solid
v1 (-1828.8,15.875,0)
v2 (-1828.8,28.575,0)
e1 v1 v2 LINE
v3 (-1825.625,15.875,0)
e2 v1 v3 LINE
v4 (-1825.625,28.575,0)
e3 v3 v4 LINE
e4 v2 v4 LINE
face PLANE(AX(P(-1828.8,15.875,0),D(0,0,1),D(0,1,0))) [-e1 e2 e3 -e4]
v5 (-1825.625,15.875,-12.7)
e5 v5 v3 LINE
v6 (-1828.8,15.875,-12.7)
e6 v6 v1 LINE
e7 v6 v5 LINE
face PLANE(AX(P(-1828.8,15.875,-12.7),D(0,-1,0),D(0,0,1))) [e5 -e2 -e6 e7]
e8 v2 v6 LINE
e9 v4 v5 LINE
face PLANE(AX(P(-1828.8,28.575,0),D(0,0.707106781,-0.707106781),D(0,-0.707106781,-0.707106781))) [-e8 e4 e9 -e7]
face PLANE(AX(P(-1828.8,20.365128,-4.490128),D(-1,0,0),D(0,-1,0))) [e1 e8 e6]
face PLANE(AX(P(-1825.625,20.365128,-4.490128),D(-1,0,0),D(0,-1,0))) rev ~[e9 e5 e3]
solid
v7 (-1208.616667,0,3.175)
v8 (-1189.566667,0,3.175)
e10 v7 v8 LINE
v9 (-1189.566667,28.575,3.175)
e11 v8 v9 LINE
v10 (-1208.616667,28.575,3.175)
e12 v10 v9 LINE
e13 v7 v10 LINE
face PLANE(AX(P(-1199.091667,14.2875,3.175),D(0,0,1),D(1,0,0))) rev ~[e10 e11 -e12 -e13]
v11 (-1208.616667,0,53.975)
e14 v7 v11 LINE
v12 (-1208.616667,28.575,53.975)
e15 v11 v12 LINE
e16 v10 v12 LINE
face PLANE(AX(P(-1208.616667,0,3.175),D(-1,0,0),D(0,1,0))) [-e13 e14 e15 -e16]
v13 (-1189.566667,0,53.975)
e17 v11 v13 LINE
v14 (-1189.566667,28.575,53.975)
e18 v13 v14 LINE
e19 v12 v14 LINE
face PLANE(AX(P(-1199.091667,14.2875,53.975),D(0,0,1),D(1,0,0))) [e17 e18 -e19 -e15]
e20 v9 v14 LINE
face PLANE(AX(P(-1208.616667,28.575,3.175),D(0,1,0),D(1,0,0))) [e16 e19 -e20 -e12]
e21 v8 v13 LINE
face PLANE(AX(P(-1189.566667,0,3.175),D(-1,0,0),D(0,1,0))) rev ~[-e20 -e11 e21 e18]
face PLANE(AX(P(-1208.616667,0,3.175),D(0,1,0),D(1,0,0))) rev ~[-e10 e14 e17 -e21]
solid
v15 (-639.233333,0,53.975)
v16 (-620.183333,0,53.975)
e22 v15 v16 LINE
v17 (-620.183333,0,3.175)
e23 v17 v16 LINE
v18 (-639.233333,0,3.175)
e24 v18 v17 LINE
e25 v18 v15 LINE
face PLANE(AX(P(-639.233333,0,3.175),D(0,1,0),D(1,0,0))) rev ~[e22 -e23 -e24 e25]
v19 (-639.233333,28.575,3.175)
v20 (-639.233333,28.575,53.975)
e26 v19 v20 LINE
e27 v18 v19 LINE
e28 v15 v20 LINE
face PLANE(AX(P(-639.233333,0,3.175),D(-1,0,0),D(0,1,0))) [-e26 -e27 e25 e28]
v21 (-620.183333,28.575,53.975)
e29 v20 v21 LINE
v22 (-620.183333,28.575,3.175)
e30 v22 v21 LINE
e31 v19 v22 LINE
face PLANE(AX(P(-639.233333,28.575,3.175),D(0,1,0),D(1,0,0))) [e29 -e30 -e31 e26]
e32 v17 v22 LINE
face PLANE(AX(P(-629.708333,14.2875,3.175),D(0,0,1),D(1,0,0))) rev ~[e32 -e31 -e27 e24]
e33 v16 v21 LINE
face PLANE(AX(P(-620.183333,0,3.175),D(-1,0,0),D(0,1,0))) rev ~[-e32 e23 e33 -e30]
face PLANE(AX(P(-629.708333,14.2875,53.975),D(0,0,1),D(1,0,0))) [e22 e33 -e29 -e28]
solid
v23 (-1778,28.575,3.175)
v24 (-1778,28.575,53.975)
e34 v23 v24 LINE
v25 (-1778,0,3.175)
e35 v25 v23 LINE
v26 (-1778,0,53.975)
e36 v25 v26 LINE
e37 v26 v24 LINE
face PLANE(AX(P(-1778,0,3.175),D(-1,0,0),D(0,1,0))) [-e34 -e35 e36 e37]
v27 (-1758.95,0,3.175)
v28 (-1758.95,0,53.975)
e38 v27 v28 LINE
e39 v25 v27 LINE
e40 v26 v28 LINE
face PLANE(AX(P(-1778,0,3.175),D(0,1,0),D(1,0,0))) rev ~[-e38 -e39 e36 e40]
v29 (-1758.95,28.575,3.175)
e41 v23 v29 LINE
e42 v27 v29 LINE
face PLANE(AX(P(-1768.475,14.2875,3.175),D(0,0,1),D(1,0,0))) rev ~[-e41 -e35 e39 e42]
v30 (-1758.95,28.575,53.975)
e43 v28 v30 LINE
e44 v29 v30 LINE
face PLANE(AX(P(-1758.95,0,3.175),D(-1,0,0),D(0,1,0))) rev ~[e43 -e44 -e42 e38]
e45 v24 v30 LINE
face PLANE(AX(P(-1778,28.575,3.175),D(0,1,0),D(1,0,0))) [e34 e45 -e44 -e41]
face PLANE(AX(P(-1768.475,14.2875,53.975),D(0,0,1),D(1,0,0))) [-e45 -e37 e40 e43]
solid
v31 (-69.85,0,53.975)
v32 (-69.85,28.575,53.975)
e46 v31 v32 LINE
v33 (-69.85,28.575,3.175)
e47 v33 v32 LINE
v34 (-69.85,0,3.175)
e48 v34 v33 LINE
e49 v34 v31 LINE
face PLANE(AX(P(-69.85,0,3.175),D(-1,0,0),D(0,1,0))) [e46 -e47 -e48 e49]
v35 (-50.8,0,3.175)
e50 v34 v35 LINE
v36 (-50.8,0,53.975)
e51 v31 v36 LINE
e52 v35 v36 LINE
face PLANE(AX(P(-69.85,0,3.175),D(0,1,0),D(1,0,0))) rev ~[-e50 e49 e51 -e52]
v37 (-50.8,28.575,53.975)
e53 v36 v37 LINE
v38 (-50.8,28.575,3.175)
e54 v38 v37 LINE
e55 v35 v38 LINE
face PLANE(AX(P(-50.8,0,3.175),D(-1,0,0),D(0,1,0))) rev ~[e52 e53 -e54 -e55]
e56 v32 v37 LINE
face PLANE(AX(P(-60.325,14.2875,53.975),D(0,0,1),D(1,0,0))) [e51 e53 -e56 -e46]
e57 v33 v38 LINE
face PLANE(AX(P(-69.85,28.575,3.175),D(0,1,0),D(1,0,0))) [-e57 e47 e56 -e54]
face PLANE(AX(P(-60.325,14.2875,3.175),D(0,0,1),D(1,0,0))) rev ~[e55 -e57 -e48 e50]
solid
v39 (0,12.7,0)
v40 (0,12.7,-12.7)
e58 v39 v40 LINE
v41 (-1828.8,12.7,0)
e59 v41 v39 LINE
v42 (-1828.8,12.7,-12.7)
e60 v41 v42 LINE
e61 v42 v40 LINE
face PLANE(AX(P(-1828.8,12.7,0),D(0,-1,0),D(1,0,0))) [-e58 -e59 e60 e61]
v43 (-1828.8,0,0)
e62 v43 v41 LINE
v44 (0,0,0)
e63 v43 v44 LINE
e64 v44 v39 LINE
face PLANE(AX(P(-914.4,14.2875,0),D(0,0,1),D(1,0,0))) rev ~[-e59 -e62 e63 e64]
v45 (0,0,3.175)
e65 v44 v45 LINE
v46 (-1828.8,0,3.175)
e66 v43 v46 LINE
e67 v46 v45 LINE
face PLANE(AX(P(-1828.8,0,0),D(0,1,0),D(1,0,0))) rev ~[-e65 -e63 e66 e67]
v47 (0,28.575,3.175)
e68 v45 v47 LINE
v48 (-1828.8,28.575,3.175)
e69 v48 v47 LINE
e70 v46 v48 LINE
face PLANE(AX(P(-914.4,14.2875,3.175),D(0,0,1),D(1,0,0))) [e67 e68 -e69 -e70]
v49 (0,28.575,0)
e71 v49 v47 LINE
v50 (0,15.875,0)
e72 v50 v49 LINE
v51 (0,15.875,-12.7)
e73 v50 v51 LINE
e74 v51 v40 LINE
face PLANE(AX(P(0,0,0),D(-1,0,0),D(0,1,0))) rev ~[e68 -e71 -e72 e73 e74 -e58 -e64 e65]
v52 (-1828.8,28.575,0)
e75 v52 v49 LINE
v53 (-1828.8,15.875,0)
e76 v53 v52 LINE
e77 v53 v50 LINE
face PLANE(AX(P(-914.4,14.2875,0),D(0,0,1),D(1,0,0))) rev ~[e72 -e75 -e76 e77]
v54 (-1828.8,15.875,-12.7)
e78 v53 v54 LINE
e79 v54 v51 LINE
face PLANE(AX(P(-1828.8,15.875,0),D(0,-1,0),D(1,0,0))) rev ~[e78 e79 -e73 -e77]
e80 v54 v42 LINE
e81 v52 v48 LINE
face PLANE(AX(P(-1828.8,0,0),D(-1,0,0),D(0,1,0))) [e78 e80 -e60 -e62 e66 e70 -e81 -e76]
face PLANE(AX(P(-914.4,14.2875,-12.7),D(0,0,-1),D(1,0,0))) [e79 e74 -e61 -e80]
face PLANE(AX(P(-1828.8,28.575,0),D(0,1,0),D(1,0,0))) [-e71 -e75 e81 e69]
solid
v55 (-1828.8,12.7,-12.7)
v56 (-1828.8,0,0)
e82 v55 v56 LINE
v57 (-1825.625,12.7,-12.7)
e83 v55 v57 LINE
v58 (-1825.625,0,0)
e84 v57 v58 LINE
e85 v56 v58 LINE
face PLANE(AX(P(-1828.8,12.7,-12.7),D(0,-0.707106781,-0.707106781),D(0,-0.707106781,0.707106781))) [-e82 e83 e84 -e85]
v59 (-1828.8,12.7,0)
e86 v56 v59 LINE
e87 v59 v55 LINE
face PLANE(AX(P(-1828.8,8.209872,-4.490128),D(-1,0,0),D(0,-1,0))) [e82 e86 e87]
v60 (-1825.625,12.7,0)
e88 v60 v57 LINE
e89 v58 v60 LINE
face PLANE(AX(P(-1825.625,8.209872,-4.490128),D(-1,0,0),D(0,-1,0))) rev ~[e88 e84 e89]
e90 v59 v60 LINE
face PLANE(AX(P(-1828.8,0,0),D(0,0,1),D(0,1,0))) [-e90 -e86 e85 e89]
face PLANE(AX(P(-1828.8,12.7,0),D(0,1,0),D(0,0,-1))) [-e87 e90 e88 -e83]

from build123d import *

# Parameters (mm, degrees)
F0_W     = 1828.8
F0_H     = 28.575
F1_DEPTH = 3.175
F4_W     = 19.05
F4_H     = 28.575
F5_DEPTH = 50.8
F6_W     = 1828.8
F6_H     = 3.175
F7_DEPTH = 12.7
F9_DEPTH = 3.175


# Not quite as in the source:
# - a feature of the source that left no trace in its solid (it failed there, or was rolled back) is left out


with BuildPart() as f1:
    # F0 (on Top) → F1 (new body)
    with BuildSketch(Plane.XY):
        with Locations((-914.4, 14.2875)):
            Rectangle(F0_W, F0_H)
    extrude(amount=F1_DEPTH)

    # F6 (on face) → F7 (join)
    with BuildSketch(Plane(origin=(0, 0, 0), x_dir=(1, 0, 0), z_dir=(0, 0, -1))):
        with Locations((-914.4, -14.2875)):
            Rectangle(F6_W, F6_H)
    extrude(amount=F7_DEPTH)


with BuildPart() as f5:
    # F4 (on face) → F5 (new body)
    with BuildSketch(Plane.XY.offset(3.175)):
        with Locations((-1768.475, 14.2875)):
            Rectangle(F4_W, F4_H)
    extrude(amount=F5_DEPTH)


with BuildPart() as f5b:
    # F4 (on face) → F5, piece 2 (new body)
    with BuildSketch(Plane.XY.offset(3.175)):
        with Locations((-1199.0916666667, 14.2875)):
            Rectangle(F4_W, F4_H)
    extrude(amount=F5_DEPTH)


with BuildPart() as f5c:
    # F4 (on face) → F5, piece 3 (new body)
    with BuildSketch(Plane.XY.offset(3.175)):
        with Locations((-629.7083333333, 14.2875)):
            Rectangle(F4_W, F4_H)
    extrude(amount=F5_DEPTH)


with BuildPart() as f5d:
    # F4 (on face) → F5, piece 4 (new body)
    with BuildSketch(Plane.XY.offset(3.175)):
        with Locations((-60.325, 14.2875)):
            Rectangle(F4_W, F4_H)
    extrude(amount=F5_DEPTH)


with BuildPart() as f9:
    # F8 (on face) → F9 (new body)
    with BuildSketch(Plane(origin=(-1828.8, 0, 0), x_dir=(0, -1, 0), z_dir=(-1, 0, 0))):
        Polygon((-12.7, -12.7), (0, 0), (-12.7, 0), align=None)
    extrude(amount=-F9_DEPTH)


with BuildPart() as f9b:
    # F8 (on face) → F9, piece 2 (new body)
    with BuildSketch(Plane(origin=(-1828.8, 0, 0), x_dir=(0, -1, 0), z_dir=(-1, 0, 0))):
        Polygon((-28.575, 0), (-15.875, -12.7), (-15.875, 0), align=None)
    extrude(amount=-F9_DEPTH)


solid = Compound([f1.part, f5.part, f5b.part, f5c.part, f5d.part, f9.part, f9b.part])
